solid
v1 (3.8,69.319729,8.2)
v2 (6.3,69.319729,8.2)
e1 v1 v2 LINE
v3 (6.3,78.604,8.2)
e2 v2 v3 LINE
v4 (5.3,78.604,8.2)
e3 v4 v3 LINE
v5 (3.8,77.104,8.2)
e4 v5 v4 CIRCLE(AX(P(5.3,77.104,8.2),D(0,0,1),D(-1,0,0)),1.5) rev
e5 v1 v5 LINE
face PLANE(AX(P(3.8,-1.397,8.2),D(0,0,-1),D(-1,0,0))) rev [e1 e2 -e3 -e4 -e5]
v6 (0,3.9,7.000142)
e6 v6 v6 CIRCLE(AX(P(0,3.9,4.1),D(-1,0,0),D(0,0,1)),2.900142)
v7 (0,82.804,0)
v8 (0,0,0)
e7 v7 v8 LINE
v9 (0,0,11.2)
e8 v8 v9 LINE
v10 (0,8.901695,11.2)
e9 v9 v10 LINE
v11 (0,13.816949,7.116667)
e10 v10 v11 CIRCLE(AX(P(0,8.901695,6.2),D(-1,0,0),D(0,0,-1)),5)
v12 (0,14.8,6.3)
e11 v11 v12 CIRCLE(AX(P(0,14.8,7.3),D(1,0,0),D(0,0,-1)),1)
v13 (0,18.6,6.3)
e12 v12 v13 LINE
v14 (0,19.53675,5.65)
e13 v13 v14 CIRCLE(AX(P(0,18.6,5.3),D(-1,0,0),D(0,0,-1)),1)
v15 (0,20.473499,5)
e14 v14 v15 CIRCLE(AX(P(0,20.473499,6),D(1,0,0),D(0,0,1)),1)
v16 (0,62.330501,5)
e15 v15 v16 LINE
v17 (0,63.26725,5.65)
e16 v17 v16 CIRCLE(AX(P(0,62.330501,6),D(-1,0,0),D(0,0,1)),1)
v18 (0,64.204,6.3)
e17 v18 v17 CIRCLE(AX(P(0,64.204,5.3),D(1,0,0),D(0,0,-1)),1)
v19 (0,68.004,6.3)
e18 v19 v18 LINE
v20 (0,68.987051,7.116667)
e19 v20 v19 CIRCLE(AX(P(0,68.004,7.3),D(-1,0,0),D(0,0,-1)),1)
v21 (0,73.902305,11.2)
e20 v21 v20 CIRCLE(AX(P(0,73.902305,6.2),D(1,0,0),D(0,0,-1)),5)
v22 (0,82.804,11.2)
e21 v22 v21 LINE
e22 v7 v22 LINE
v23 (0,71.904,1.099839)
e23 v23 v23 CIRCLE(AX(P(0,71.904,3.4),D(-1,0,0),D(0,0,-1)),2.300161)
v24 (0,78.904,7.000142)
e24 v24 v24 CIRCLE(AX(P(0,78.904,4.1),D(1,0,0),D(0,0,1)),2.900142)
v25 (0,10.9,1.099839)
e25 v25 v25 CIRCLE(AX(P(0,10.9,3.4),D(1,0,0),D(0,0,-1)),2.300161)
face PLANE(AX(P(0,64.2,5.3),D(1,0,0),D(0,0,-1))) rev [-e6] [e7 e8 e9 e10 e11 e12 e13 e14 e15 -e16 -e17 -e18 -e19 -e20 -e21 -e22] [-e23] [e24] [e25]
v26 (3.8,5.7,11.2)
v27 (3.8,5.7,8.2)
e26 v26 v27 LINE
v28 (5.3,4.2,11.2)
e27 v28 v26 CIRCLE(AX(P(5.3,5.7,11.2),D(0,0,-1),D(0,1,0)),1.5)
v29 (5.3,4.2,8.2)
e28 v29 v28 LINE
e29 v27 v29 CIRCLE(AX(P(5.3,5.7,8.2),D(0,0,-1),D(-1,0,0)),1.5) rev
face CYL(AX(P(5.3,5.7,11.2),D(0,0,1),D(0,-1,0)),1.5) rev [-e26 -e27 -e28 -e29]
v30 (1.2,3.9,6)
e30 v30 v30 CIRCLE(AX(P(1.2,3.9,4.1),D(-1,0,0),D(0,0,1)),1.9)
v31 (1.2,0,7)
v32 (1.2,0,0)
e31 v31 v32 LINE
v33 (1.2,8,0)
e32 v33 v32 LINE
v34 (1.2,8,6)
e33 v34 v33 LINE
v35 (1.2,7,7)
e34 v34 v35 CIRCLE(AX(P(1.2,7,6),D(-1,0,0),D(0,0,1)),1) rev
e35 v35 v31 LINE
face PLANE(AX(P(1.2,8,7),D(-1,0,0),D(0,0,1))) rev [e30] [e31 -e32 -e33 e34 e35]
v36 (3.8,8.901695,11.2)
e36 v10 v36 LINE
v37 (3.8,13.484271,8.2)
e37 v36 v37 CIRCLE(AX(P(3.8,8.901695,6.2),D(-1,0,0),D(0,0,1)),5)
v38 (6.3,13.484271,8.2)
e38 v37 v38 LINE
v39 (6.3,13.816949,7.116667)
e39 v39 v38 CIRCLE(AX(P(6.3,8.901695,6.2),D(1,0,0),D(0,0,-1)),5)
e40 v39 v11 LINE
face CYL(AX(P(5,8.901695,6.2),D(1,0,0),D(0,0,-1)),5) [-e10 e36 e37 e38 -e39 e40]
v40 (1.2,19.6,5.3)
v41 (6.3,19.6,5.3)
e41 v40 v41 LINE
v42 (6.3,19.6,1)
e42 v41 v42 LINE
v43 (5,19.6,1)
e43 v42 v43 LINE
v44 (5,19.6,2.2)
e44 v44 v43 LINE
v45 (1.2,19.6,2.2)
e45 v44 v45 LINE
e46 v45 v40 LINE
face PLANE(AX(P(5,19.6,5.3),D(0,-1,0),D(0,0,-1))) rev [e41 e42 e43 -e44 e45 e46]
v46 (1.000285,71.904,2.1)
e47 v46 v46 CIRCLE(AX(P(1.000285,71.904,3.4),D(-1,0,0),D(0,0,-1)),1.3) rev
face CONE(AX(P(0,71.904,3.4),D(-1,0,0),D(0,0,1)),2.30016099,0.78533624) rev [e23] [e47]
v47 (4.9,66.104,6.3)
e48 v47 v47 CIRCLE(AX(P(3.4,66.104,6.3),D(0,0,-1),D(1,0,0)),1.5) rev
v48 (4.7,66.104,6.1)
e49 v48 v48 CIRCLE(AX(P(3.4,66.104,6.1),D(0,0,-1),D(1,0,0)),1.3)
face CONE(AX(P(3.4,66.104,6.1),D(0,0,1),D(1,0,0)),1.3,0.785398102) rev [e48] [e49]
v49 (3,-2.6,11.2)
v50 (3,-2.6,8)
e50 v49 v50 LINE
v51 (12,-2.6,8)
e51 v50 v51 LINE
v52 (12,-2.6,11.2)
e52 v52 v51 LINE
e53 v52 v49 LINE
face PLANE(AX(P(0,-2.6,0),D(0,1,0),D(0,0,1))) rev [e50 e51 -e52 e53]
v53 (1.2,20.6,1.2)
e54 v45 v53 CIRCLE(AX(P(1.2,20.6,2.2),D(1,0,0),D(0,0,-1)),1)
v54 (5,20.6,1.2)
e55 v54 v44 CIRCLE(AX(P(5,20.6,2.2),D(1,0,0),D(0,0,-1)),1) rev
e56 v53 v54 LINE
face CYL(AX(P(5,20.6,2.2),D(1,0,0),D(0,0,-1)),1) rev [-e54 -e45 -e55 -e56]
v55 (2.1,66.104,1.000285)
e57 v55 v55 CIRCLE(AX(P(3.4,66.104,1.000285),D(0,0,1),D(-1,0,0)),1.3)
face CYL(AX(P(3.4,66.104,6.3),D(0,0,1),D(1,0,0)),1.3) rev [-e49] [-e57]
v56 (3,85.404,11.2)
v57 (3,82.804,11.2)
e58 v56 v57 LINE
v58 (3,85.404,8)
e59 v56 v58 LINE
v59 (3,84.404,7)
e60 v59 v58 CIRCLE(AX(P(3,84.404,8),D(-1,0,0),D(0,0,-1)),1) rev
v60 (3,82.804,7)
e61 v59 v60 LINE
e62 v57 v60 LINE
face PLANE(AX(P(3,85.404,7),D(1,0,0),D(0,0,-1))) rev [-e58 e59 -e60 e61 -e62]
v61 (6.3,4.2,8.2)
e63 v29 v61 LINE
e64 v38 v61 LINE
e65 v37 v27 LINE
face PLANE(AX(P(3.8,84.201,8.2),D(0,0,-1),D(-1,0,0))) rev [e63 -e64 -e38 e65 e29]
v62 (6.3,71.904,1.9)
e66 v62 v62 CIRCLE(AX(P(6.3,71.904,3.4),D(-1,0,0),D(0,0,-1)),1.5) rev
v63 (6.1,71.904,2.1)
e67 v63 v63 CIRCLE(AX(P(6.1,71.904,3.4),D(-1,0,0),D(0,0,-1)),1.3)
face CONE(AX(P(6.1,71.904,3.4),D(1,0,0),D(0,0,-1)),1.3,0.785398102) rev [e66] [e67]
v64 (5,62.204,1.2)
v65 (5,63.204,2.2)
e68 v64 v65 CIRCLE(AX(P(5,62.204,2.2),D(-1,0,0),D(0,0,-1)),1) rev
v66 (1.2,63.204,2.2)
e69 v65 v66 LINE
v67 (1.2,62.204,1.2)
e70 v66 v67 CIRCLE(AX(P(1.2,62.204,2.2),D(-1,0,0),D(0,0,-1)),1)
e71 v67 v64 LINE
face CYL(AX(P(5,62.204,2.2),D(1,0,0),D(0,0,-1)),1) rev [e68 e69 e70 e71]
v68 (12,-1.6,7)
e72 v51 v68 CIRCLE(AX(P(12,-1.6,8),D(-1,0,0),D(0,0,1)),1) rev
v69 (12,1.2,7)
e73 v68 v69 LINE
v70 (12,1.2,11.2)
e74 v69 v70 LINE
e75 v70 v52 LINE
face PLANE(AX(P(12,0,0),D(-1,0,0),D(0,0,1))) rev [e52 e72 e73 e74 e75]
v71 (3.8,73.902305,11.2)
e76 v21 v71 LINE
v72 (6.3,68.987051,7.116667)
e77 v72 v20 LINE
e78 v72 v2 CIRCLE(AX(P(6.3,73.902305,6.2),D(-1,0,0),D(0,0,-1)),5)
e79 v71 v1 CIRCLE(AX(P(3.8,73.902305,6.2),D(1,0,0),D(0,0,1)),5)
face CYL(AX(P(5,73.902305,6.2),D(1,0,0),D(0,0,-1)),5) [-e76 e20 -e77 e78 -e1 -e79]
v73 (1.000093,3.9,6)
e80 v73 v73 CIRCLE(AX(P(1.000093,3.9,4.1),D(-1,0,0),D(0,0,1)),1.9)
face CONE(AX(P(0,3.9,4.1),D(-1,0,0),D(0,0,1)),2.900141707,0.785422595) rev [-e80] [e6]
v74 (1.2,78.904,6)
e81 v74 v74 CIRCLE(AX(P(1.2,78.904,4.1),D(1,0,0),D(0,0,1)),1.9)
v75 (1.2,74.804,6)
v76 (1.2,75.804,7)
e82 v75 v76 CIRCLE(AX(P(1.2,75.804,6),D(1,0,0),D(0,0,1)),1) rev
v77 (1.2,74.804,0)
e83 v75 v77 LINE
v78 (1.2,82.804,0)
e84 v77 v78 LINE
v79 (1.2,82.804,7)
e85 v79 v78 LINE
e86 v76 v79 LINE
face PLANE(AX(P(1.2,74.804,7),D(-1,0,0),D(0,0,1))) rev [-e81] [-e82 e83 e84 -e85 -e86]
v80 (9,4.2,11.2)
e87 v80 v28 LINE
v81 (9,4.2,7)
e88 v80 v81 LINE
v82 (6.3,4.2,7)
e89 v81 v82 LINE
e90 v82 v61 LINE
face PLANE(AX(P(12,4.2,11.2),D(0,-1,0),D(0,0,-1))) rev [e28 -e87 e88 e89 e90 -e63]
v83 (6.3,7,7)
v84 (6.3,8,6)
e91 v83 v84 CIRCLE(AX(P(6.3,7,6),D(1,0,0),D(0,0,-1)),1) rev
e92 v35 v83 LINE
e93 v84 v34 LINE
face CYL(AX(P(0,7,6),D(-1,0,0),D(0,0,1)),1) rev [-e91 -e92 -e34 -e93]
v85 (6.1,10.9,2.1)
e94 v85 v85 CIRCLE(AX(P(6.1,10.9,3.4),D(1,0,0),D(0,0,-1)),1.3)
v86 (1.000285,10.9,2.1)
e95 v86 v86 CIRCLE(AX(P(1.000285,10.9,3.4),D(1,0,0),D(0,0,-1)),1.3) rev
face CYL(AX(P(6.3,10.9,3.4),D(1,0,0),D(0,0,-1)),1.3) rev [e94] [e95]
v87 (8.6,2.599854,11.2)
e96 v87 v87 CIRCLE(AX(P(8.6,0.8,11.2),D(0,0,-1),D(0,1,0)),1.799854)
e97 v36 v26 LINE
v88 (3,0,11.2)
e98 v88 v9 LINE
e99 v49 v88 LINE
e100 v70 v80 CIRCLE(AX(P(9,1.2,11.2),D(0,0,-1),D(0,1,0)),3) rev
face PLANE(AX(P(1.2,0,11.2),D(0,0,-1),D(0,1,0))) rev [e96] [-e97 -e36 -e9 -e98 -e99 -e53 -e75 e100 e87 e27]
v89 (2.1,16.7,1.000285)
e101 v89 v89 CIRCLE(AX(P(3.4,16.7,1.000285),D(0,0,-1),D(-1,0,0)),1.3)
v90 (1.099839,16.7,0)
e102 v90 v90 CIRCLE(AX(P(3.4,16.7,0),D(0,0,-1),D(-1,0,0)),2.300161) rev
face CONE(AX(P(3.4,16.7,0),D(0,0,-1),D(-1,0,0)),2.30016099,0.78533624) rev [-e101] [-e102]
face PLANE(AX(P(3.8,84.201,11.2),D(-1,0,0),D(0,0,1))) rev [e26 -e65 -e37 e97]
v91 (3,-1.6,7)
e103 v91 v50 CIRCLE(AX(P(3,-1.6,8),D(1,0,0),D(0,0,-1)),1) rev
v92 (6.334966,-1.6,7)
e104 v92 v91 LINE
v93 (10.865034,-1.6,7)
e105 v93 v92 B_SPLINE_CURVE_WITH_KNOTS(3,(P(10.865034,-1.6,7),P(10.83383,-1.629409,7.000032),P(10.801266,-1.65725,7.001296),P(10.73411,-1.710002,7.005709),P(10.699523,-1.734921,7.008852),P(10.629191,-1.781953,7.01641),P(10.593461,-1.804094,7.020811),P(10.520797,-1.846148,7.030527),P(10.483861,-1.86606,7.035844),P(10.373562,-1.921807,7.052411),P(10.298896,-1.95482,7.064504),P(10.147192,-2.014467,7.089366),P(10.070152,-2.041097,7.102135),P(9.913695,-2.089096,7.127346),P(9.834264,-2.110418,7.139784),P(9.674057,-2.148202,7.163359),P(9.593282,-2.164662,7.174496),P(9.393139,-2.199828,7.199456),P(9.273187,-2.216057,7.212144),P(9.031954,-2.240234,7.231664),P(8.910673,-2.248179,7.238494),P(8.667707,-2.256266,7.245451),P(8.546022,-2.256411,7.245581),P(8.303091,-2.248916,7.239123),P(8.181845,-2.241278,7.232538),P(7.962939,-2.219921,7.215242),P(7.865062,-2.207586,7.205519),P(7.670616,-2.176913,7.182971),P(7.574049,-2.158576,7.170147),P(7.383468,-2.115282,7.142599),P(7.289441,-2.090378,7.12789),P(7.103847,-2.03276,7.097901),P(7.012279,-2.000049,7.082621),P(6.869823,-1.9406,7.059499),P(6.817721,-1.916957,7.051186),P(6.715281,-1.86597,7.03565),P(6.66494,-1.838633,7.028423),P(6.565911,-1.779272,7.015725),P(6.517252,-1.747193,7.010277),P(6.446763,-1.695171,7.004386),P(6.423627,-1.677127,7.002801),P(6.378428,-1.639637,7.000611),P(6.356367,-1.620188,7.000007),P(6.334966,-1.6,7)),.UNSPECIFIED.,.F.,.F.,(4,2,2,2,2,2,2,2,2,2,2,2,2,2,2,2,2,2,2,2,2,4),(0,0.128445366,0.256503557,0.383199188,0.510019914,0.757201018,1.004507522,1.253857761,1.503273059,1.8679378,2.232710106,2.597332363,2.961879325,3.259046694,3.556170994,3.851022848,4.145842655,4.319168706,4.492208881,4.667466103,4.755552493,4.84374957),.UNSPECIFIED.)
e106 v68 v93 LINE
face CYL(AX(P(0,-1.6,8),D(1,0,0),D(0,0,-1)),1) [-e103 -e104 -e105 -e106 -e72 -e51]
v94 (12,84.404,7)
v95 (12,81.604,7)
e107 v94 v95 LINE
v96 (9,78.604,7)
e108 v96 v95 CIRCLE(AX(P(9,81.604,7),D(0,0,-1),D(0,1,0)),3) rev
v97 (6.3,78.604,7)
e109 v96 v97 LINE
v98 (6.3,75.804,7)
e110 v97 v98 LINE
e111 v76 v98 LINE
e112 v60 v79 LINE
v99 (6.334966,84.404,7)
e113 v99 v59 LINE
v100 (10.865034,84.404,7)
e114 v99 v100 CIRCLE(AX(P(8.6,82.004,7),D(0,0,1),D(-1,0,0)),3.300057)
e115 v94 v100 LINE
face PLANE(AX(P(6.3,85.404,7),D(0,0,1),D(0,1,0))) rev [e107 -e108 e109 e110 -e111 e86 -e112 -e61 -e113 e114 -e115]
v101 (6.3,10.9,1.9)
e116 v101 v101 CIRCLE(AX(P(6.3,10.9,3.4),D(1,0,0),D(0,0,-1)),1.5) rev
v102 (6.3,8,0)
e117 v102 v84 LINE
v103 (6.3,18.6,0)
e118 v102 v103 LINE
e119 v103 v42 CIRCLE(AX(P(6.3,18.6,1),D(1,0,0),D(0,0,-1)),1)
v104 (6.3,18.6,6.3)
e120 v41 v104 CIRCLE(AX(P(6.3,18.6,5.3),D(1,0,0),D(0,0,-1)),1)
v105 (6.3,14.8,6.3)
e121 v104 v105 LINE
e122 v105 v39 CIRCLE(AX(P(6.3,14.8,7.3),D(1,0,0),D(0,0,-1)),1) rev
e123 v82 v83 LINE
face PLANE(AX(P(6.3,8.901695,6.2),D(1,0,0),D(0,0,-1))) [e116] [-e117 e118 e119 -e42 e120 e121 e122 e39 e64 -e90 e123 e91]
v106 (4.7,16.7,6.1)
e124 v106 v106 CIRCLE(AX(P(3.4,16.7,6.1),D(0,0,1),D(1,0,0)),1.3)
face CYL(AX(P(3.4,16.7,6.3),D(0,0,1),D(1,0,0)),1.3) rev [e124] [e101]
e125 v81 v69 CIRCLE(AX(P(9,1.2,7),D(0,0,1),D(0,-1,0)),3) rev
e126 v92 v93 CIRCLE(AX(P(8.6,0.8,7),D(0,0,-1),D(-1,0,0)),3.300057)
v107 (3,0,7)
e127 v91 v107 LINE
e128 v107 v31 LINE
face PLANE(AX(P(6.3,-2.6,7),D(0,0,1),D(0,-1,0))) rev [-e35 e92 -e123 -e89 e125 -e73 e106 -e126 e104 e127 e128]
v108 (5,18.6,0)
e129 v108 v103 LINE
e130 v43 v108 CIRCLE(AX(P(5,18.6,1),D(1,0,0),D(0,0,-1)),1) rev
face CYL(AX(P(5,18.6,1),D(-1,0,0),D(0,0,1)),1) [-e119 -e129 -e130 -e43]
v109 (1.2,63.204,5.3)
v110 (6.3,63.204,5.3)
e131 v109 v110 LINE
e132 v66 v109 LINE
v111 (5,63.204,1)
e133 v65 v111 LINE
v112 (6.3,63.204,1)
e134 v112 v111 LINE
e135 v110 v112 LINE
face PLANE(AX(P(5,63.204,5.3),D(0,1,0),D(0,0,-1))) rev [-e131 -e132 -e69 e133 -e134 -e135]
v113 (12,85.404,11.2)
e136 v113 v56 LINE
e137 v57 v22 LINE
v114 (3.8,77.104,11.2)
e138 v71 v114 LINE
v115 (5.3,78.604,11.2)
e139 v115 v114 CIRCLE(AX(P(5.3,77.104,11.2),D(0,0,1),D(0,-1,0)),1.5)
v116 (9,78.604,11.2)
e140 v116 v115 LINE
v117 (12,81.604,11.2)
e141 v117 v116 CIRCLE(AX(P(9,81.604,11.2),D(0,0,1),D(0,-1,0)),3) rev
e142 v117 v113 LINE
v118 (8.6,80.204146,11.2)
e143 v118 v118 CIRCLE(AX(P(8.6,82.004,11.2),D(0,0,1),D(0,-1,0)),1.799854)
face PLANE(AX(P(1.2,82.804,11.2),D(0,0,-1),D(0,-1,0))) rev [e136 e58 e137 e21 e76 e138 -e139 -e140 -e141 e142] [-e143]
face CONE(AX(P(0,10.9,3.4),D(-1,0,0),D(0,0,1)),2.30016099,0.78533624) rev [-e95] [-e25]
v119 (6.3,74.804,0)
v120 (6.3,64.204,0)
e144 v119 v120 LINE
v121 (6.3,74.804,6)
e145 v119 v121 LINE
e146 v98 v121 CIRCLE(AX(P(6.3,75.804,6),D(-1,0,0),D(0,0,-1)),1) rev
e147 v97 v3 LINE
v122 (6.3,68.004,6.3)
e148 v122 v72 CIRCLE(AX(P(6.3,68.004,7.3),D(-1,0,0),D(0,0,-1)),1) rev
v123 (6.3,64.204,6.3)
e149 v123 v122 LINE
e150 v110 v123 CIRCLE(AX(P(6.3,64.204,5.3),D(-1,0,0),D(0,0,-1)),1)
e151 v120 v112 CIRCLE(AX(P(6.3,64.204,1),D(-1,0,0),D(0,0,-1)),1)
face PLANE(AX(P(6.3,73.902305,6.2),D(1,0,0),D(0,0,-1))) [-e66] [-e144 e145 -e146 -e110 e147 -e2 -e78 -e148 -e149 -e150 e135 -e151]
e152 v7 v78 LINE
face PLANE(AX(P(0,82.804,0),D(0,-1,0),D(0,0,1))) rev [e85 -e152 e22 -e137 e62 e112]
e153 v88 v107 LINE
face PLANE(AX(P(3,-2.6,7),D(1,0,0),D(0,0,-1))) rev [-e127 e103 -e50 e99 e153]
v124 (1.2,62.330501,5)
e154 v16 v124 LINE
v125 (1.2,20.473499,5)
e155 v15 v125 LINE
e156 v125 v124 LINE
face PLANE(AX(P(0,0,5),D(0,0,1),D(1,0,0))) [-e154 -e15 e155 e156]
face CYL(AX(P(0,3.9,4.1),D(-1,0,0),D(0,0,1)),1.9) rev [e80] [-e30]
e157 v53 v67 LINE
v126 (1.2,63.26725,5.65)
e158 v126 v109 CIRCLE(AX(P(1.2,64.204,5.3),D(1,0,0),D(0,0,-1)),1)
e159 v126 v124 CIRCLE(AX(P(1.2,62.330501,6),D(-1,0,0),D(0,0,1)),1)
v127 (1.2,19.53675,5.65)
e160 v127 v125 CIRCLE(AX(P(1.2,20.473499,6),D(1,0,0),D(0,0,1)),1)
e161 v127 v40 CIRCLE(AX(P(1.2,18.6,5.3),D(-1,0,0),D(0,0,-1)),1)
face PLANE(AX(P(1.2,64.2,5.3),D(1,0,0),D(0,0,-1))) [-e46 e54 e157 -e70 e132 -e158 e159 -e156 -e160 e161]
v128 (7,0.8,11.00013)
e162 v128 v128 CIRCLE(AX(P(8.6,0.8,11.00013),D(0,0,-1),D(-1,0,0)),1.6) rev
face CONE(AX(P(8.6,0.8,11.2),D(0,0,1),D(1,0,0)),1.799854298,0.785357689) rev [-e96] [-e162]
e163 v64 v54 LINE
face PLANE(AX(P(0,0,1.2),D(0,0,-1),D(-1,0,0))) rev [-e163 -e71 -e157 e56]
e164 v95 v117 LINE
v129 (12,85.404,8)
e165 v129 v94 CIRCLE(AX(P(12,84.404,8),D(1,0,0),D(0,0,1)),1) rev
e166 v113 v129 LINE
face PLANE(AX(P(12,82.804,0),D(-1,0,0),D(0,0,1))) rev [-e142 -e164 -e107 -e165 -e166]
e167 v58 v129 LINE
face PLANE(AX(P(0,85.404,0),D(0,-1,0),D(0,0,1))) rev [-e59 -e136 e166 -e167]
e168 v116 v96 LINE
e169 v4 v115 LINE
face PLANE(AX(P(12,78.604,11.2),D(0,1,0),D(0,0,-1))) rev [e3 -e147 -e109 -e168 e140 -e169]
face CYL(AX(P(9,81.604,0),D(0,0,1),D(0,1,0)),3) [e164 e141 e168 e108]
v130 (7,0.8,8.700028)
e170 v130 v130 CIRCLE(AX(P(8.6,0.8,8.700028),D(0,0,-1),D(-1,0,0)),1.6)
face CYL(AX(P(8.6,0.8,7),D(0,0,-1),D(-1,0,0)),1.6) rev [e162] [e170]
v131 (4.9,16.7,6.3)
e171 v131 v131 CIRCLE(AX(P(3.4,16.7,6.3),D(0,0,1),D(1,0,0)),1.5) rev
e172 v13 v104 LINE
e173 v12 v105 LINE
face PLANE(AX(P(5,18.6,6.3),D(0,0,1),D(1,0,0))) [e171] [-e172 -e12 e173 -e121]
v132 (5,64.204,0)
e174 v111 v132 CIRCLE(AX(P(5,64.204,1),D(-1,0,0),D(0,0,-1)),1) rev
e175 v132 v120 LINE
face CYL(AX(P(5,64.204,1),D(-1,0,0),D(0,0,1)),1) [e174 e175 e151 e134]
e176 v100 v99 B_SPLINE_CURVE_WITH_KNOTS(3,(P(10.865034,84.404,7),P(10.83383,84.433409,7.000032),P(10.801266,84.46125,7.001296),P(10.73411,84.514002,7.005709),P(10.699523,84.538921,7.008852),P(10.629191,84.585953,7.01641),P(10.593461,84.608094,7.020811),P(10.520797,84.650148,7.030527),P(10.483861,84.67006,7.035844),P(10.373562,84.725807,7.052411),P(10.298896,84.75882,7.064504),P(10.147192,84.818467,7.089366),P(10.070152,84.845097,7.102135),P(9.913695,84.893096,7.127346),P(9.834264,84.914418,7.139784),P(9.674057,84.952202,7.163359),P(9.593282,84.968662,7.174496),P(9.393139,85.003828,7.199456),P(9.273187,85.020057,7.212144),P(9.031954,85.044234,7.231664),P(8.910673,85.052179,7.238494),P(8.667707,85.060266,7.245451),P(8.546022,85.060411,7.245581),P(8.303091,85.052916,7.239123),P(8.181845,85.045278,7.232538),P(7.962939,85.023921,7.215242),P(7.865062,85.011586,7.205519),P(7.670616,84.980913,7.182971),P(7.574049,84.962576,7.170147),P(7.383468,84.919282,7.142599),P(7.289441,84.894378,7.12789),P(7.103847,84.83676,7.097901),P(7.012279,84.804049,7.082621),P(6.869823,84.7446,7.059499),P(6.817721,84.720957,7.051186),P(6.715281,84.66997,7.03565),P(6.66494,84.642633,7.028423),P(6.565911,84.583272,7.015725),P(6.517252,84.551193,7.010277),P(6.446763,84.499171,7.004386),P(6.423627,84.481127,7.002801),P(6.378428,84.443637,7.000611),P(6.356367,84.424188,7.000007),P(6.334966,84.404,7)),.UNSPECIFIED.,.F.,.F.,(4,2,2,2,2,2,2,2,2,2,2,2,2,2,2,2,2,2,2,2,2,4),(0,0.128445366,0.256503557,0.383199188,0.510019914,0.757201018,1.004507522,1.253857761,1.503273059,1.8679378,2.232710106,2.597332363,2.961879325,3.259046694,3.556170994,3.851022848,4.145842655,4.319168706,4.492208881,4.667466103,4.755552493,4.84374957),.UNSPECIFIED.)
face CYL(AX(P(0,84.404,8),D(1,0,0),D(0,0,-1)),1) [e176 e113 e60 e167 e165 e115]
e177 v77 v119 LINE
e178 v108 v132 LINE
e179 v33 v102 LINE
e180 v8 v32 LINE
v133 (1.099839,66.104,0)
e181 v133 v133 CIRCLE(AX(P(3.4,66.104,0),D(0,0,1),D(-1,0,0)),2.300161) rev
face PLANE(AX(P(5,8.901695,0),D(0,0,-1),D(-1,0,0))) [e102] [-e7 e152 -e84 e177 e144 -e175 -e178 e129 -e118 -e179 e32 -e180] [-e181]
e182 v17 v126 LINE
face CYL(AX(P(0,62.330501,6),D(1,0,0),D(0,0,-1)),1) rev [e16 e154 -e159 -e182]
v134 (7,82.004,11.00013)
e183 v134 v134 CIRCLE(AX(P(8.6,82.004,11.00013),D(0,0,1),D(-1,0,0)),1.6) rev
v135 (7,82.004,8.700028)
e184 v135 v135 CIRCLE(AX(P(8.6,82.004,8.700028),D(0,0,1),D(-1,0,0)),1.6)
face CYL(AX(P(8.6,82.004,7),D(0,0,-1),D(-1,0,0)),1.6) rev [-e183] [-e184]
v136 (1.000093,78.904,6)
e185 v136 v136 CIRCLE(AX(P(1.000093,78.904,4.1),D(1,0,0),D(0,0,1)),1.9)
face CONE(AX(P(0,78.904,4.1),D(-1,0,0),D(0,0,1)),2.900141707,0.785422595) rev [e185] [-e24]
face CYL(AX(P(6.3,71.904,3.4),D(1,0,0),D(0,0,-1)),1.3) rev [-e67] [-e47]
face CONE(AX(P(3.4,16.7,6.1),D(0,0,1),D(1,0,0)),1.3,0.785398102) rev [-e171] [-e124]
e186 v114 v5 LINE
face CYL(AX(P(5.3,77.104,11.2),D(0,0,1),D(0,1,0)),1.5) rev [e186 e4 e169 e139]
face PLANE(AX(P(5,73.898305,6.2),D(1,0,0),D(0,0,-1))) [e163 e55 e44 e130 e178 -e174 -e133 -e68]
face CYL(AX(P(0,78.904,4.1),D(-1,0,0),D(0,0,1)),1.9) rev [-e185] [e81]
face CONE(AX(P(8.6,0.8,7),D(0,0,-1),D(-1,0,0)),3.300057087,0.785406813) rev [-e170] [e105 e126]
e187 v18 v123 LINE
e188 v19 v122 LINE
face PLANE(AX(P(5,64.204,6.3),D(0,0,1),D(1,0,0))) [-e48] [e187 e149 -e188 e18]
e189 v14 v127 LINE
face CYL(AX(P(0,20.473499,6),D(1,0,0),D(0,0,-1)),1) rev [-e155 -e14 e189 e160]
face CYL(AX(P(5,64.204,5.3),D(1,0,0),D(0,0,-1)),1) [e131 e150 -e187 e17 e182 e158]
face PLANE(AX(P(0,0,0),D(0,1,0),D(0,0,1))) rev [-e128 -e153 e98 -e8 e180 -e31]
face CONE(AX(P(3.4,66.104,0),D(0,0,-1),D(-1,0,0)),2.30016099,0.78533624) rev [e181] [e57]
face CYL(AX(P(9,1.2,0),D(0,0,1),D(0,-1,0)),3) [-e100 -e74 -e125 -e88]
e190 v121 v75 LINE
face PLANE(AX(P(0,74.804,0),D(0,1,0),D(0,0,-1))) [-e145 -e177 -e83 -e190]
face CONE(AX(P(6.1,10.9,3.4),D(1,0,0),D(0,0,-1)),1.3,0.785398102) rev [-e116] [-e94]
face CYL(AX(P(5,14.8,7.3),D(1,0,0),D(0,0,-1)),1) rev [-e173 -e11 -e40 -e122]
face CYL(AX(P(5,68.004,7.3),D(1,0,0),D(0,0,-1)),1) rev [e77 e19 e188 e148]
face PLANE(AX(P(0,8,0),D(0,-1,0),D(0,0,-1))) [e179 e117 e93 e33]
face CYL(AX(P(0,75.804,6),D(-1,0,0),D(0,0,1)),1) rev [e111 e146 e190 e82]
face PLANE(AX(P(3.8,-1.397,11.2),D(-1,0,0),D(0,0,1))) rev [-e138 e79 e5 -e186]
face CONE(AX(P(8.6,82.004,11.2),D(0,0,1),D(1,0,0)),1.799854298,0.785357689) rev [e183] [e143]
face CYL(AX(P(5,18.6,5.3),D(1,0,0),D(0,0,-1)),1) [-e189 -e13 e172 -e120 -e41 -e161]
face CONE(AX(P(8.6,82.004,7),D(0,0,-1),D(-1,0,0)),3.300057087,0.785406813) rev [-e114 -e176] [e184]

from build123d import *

# Parameters (mm, degrees)
SALIENTE_EXTRUIR1_DEPTH                              = 1.3
SALIENTE_EXTRUIR2_DEPTH                              = 3.8
CORTAR_EXTRUIR1_DEPTH                                = 1.3
SALIENTE_EXTRUIR3_START                              = 1.3
SALIENTE_EXTRUIR3_DEPTH                              = 1.3
CROQUIS14_W                                          = 5.1
CROQUIS14_H                                          = 11.2
SALIENTE_EXTRUIR4_DEPTH                              = 8.901695159
CROQUIS15_W                                          = 5.1
CROQUIS15_H                                          = 11.2
SALIENTE_EXTRUIR5_DEPTH                              = 8.901695176
CROQUIS22_W                                          = 3.8
CROQUIS22_H                                          = 43.6
CORTAR_EXTRUIR2_DEPTH                                = 0.3
SALIENTE_EXTRUIR6_DEPTH                              = 1.2
CROQUIS31_W                                          = 4.2
CROQUIS31_H                                          = 5.4
SALIENTE_EXTRUIR7_DEPTH                              = 3.5
CROQUIS32_W                                          = 7
CROQUIS32_H                                          = 8
CORTAR_EXTRUIR3_DEPTH                                = 5.1
CROQUIS41_W                                          = 6.8
CROQUIS41_H                                          = 4.2
SALIENTE_EXTRUIR8_DEPTH                              = 1.4
CROQUIS42_W                                          = 3.3
CROQUIS42_H                                          = 4.2
SALIENTE_EXTRUIR9_DEPTH                              = 2.6
CROQUIS43_W                                          = 5.1
CROQUIS43_H                                          = 7
CORTAR_EXTRUIR4_DEPTH                                = 8
CROQUIS48_W                                          = 4.2
CROQUIS48_H                                          = 6.8
SALIENTE_EXTRUIR10_DEPTH                             = 5.7
CORTAR_EXTRUIR5_REACH                                = 87.637
CROQUIS58_W                                          = 3.8
CROQUIS58_H                                          = 43.6
CORTAR_EXTRUIR6_REACH                                = 83.667
CROQUIS80_W                                          = 2.5
CROQUIS80_H                                          = 3
CORTAR_EXTRUIR7_REACH                                = 83.667
CROQUIS93_W                                          = 2.5
CROQUIS93_H                                          = 3
AVELLANADO_PARA_TORNILLO_CON_CABEZA_PLAN_D           = 3.8
AVELLANADO_PARA_TORNILLO_CON_CABEZA_PLAN_DEPTH       = 12
AVELLANADO_PARA_TORNILLO_CON_CABEZA_PLAN_CSINK_D     = 5.800283413
AVELLANADO_PARA_TORNILLO_CON_CABEZA_PLAN_CSINK_ANGLE = 90.0028
TALADRO_DE_MARGEN_PARA_21_D                          = 2.6
TALADRO_DE_MARGEN_PARA_22_D                          = 2.6
TALADRO_DE_MARGEN_PARA_22_DEPTH                      = 11.2
TALADRO_DE_MARGEN_PARA_23_D                          = 2.6
AVELLANADO_PARA_TORNILLO_CON_CABEZA_2_D              = 3.2
AVELLANADO_PARA_TORNILLO_CON_CABEZA_2_CSINK_D        = 6.600114174
AVELLANADO_PARA_TORNILLO_CON_CABEZA_2_CSINK_ANGLE    = 90.000991
REDONDEO1_R                                          = 3
CHAFL_N1_SIZE2                                       = 0.19999984
CHAFL_N1_SIZE                                        = 0.199999815
CORTAR_EXTRUIR8_OUTLINE_R                            = 1.3
CORTAR_EXTRUIR8_OUTLINE_R_2                          = 1.9
CORTAR_EXTRUIR8_DEPTH                                = 13
CORTAR_EXTRUIR8_START                                = 5
CORTAR_EXTRUIR8_2_DEPTH                              = 1.3
CORTAR_EXTRUIR8_3_DEPTH                              = 5
CORTAR_EXTRUIR8_4_DEPTH                              = 1.3
CORTAR_EXTRUIR8_START_2                              = 7
CORTAR_EXTRUIR8_5_DEPTH                              = 4.2


with BuildPart() as part:
    # Croquis1 → Saliente-Extruir1 (new body)
    with BuildSketch(Plane(origin=(6.3, 0, 0), x_dir=(0, 0, -1), z_dir=(1, 0, 0))):
        with BuildLine():
            Line((-11.2, 8.901695159), (0, 8.901695159))
            Line((0, 8.901695159), (0, 73.898304841))
            Line((0, 73.898304841), (-11.2, 73.898304841))
            ThreePointArc((-11.2, 73.898304841), (-9.770714214, 70.398304841), (-6.3, 68.899304941))
            Line((-6.3, 68.899304941), (-6.3, 64.2))
            ThreePointArc((-6.3, 64.2), (-6.007106781, 63.492893219), (-5.3, 63.2))
            Line((-5.3, 63.2), (-5.3, 19.6))
            ThreePointArc((-5.3, 19.6), (-6.007106781, 19.307106781), (-6.3, 18.6))
            Line((-6.3, 18.6), (-6.3, 13.900695059))
            ThreePointArc((-6.3, 13.900695059), (-9.770714214, 12.401695159), (-11.2, 8.901695159))
        make_face()
    extrude(amount=-SALIENTE_EXTRUIR1_DEPTH)

    # Croquis6 → Saliente-Extruir2 (add)
    with BuildSketch(Plane.ZY.offset(-5)):
        with BuildLine():
            Line((0, 73.898304841), (11.2, 73.898304841))
            ThreePointArc((11.2, 73.898304841), (9.770714214, 70.398304841), (6.3, 68.899304941))
            Line((6.3, 68.899304941), (6.3, 64.2))
            ThreePointArc((6.3, 64.2), (6.007106781, 63.492893219), (5.3, 63.2))
            Line((5.3, 63.2), (5.3, 19.6))
            ThreePointArc((5.3, 19.6), (6.007106781, 19.307106781), (6.3, 18.6))
            Line((6.3, 18.6), (6.3, 13.900695059))
            ThreePointArc((6.3, 13.900695059), (9.770714214, 12.401695159), (11.2, 8.901695159))
            Line((11.2, 8.901695159), (0, 8.901695159))
            Line((0, 8.901695159), (0, 73.898304841))
        make_face()
    extrude(amount=SALIENTE_EXTRUIR2_DEPTH)

    # Croquis7 → Cortar-Extruir1 (cut)
    with BuildSketch(Plane(origin=(6.3, 0, 0), x_dir=(0, 0, -1), z_dir=(1, 0, 0))):
        with BuildLine():
            Line((-5.3, 19.6), (0, 19.6))
            Line((0, 19.6), (0, 73.898304841))
            Line((0, 73.898304841), (-11.2, 73.898304841))
            ThreePointArc((-11.2, 73.898304841), (-9.770714214, 70.398304841), (-6.3, 68.899304941))
            Line((-6.3, 68.899304941), (-6.3, 64.2))
            ThreePointArc((-6.3, 64.2), (-6.007106781, 63.492893219), (-5.3, 63.2))
            Line((-5.3, 63.2), (-5.3, 19.6))
        make_face()
    extrude(amount=-CORTAR_EXTRUIR1_DEPTH, mode=Mode.SUBTRACT)

    # Croquis8 → Saliente-Extruir3 (add)
    with BuildSketch(Plane(origin=(5, 0, 0), x_dir=(0, 0, -1), z_dir=(1, 0, 0)).offset(SALIENTE_EXTRUIR3_START)):
        with BuildLine():
            Line((0, 73.898304841), (0, 63.2))
            Line((0, 63.2), (-5.3, 63.2))
            ThreePointArc((-5.3, 63.2), (-6.007106781, 63.492893219), (-6.3, 64.2))
            Line((-6.3, 64.2), (-6.3, 68.899304941))
            ThreePointArc((-6.3, 68.899304941), (-9.770714214, 70.398304841), (-11.2, 73.898304841))
            Line((-11.2, 73.898304841), (0, 73.898304841))
        make_face()
    extrude(amount=-SALIENTE_EXTRUIR3_DEPTH)

    # Croquis14 → Saliente-Extruir4 (add)
    with BuildSketch(Plane(origin=(0, 73.898304841, 0), x_dir=(1, 0, 0), z_dir=(0, 1, 0))):
        with Locations((3.75, -5.6)):
            Rectangle(CROQUIS14_W, CROQUIS14_H)
    extrude(amount=SALIENTE_EXTRUIR4_DEPTH)

    # Croquis15 → Saliente-Extruir5 (add)
    with BuildSketch(Plane.XZ.offset(-8.901695159)):
        with Locations((3.75, 5.6)):
            Rectangle(CROQUIS15_W, CROQUIS15_H)
    extrude(amount=SALIENTE_EXTRUIR5_DEPTH)

    # Croquis22 → Cortar-Extruir2 (cut)
    with BuildSketch(Plane.XY.offset(5.3)):
        with Locations((3.1, 41.4)):
            Rectangle(CROQUIS22_W, CROQUIS22_H)
    extrude(amount=-CORTAR_EXTRUIR2_DEPTH, mode=Mode.SUBTRACT)

    # Croquis30 → Saliente-Extruir6 (add)
    with BuildSketch(Plane.ZY.offset(-1.2)):
        with BuildLine():
            Line((6.3, 68.899304941), (6.3, 64.2))
            ThreePointArc((6.3, 64.2), (6.121583836, 63.629912287), (5.65, 63.2632503))
            ThreePointArc((5.65, 63.2632503), (5.178416164, 62.896588313), (5, 62.3265006))
            Line((5, 62.3265006), (5, 20.4734994))
            ThreePointArc((5, 20.4734994), (5.178416164, 19.903411687), (5.65, 19.5367497))
            ThreePointArc((5.65, 19.5367497), (6.121583836, 19.170087713), (6.3, 18.6))
            Line((6.3, 18.6), (6.3, 13.900695059))
            ThreePointArc((6.3, 13.900695059), (9.770714214, 12.401695159), (11.2, 8.901695159))
            Line((11.2, 8.901695159), (11.2, 0))
            Line((11.2, 0), (0, 0))
            Line((0, 0), (0, 82.8))
            Line((0, 82.8), (11.2, 82.8))
            Line((11.2, 82.8), (11.2, 73.898304841))
            ThreePointArc((11.2, 73.898304841), (9.770714214, 70.398304841), (6.3, 68.899304941))
        make_face()
    extrude(amount=SALIENTE_EXTRUIR6_DEPTH)

    # Croquis31 → Saliente-Extruir7 (add)
    with BuildSketch(Plane(origin=(6.3, 0, 0), x_dir=(0, 0, -1), z_dir=(1, 0, 0))):
        with Locations((-9.1, 80.1)):
            Rectangle(CROQUIS31_W, CROQUIS31_H)
    extrude(amount=SALIENTE_EXTRUIR7_DEPTH)

    # Croquis32 → Cortar-Extruir3 (cut)
    with BuildSketch(Plane(origin=(6.3, 0, 0), x_dir=(0, 0, -1), z_dir=(1, 0, 0))):
        with Locations((-3.5, 78.8)):
            Rectangle(CROQUIS32_W, CROQUIS32_H)
    extrude(amount=-CORTAR_EXTRUIR3_DEPTH, mode=Mode.SUBTRACT)

    # Croquis41 → Saliente-Extruir8 (add)
    with BuildSketch(Plane(origin=(0, 82.8, 0), x_dir=(1, 0, 0), z_dir=(0, 1, 0))):
        with Locations((6.4, -9.1)):
            Rectangle(CROQUIS41_W, CROQUIS41_H)
    extrude(amount=SALIENTE_EXTRUIR8_DEPTH)

    # Croquis42 → Saliente-Extruir9 (add)
    with BuildSketch(Plane.XZ):
        with Locations((4.65, 9.1)):
            Rectangle(CROQUIS42_W, CROQUIS42_H)
    extrude(amount=SALIENTE_EXTRUIR9_DEPTH)

    # Croquis43 → Cortar-Extruir4 (cut)
    with BuildSketch(Plane.XZ):
        with Locations((3.75, 3.5)):
            Rectangle(CROQUIS43_W, CROQUIS43_H)
    extrude(amount=-CORTAR_EXTRUIR4_DEPTH, mode=Mode.SUBTRACT)

    # Croquis48 → Saliente-Extruir10 (add)
    with BuildSketch(Plane(origin=(6.3, 0, 0), x_dir=(0, 0, -1), z_dir=(1, 0, 0))):
        with Locations((-9.1, 0.8)):
            Rectangle(CROQUIS48_W, CROQUIS48_H)
    extrude(amount=SALIENTE_EXTRUIR10_DEPTH)

    # Croquis58 → Cortar-Extruir5 (cut, up to next)
    with BuildSketch(Plane(origin=(0, 0, 1.2), x_dir=(-1, 0, 0), z_dir=(0, 0, -1)), mode=Mode.PRIVATE) as cortar_extruir5_sk1:
        with Locations((-3.1, 41.4)):
            Rectangle(CROQUIS58_W, CROQUIS58_H)
    cortar_extruir5_tool1 = extrude(cortar_extruir5_sk1.sketch, amount=-CORTAR_EXTRUIR5_REACH, mode=Mode.PRIVATE) & part.part
    add(cortar_extruir5_tool1.solids().sort_by_distance((3.1, 41.4, 1.2))[0], mode=Mode.SUBTRACT)

    # Croquis80 → Cortar-Extruir6 (cut, up to next)
    with BuildSketch(Plane(origin=(0, 77.4, 0), x_dir=(1, 0, 0), z_dir=(0, 1, 0)), mode=Mode.PRIVATE) as cortar_extruir6_sk1:
        with Locations((5.05, -9.7)):
            Rectangle(CROQUIS80_W, CROQUIS80_H)
    cortar_extruir6_tool1 = extrude(cortar_extruir6_sk1.sketch, amount=-CORTAR_EXTRUIR6_REACH, mode=Mode.PRIVATE) & part.part
    add(cortar_extruir6_tool1.solids().sort_by_distance((5.05, 77.4, 9.7))[0], mode=Mode.SUBTRACT)

    # Croquis93 → Cortar-Extruir7 (cut, up to next)
    with BuildSketch(Plane(origin=(0, 4.2, 0), x_dir=(-1, 0, 0), z_dir=(0, -1, 0)), mode=Mode.PRIVATE) as cortar_extruir7_sk1:
        with Locations((-5.05, -9.7)):
            Rectangle(CROQUIS93_W, CROQUIS93_H)
    cortar_extruir7_tool1 = extrude(cortar_extruir7_sk1.sketch, amount=-CORTAR_EXTRUIR7_REACH, mode=Mode.PRIVATE) & part.part
    add(cortar_extruir7_tool1.solids().sort_by_distance((5.05, 4.2, 9.7))[0], mode=Mode.SUBTRACT)

    # Avellanado para tornillo con cabeza plan
    with Locations(Plane.ZY):
        with Locations((4.1, 3.9), (4.1, 78.9)):
            CounterSinkHole(AVELLANADO_PARA_TORNILLO_CON_CABEZA_PLAN_D / 2, AVELLANADO_PARA_TORNILLO_CON_CABEZA_PLAN_CSINK_D / 2, depth=AVELLANADO_PARA_TORNILLO_CON_CABEZA_PLAN_DEPTH, counter_sink_angle=AVELLANADO_PARA_TORNILLO_CON_CABEZA_PLAN_CSINK_ANGLE)

    # Taladro de margen para #21 (through all)
    with Locations(Plane(origin=(6.3, 0, 0), x_dir=(0, 0, -1), z_dir=(1, 0, 0))):
        with Locations((-3.4, 10.9), (-3.4, 71.9)):
            Hole(TALADRO_DE_MARGEN_PARA_21_D / 2)

    # Taladro de margen para #22
    with Locations(Plane(origin=(0, 0, 0), x_dir=(-1, 0, 0), z_dir=(0, 0, -1))):
        with Locations((-3.4, 66.1)):
            Hole(TALADRO_DE_MARGEN_PARA_22_D / 2, depth=TALADRO_DE_MARGEN_PARA_22_DEPTH)

    # Taladro de margen para #23 (through all)
    with Locations(Plane.XY.offset(6.3)):
        with Locations((3.4, 16.7)):
            Hole(TALADRO_DE_MARGEN_PARA_23_D / 2)

    # Avellanado para tornillo con cabeza  2 (through all)
    with Locations(Plane(origin=(0, 0, 7), x_dir=(-1, 0, 0), z_dir=(0, 0, -1))):
        with Locations((-6.4, 80.8), (-8.6, 0.8)):
            CounterSinkHole(AVELLANADO_PARA_TORNILLO_CON_CABEZA_2_D / 2, AVELLANADO_PARA_TORNILLO_CON_CABEZA_2_CSINK_D / 2, counter_sink_angle=AVELLANADO_PARA_TORNILLO_CON_CABEZA_2_CSINK_ANGLE)

    # Redondeo1
    redondeo1_edges = [part.edges().sort_by_distance(p)[0] for p in [
        (9.8, 77.4, 9.1),
        (12, 4.2, 9.1),
    ]]
    fillet(redondeo1_edges, radius=REDONDEO1_R)

    # Chaflán1
    chafl_n1_edges = [part.edges().sort_by_distance(p)[0] for p in [
        (6.3, 71.9, 2.1),
        (6.3, 10.9, 2.1),
        (2.1, 66.1, 6.3),
        (4.7, 16.7, 6.3),
    ]]
    chamfer(chafl_n1_edges, length=CHAFL_N1_SIZE, length2=CHAFL_N1_SIZE2)

    # Cortar-Extruir8: read off the stored shape, not the designer's step
    # Cortar-Extruir8 outline → Cortar-Extruir8 (cut)
    # profile 1 of 2: a face of its own
    with BuildSketch(Plane.YZ):
        with BuildLine():
            Line((-2.6, 7), (-1.6, 7))
            ThreePointArc((-1.6, 7), (-2.307106781, 7.292893219), (-2.6, 8))
            Line((-2.6, 8), (-2.6, 7))
        make_face()
    # profile 2 of 2: a face of its own
    with BuildSketch(Plane.YZ):
        with BuildLine():
            Line((41.402, 0), (82.8, 0))
            Line((82.8, 0), (82.8, 7))
            Line((82.8, 7), (84.2, 7))
            Line((84.2, 7), (84.2, 11.2))
            Line((84.2, 11.2), (73.898304841, 11.2))
            ThreePointArc((73.898304841, 11.2), (70.398304841, 9.770714214), (68.899304941, 6.3))
            Line((68.899304941, 6.3), (64.2, 6.3))
            ThreePointArc((64.2, 6.3), (63.629912288, 6.121583836), (63.2632503, 5.65))
            ThreePointArc((63.2632503, 5.65), (62.896588313, 5.178416164), (62.3265006, 5))
            Line((62.3265006, 5), (41.402, 5))
            Line((41.402, 5), (41.402, 0))
        make_face()
        with Locations((71.9, 3.4)):
            Circle(CORTAR_EXTRUIR8_OUTLINE_R, mode=Mode.SUBTRACT)
        with Locations((78.9, 4.1)):
            Circle(CORTAR_EXTRUIR8_OUTLINE_R_2, mode=Mode.SUBTRACT)
    extrude(amount=CORTAR_EXTRUIR8_DEPTH, mode=Mode.SUBTRACT)

    # Cortar-Extruir8 2 outline → Cortar-Extruir8 2 (cut)
    with BuildSketch(Plane.YZ.offset(CORTAR_EXTRUIR8_START)):
        with BuildLine():
            Line((19.6, 0), (19.6, 1))
            ThreePointArc((19.6, 1), (19.307106781, 0.292893219), (18.6, 0))
            Line((18.6, 0), (19.6, 0))
        make_face()
    extrude(amount=CORTAR_EXTRUIR8_2_DEPTH, mode=Mode.SUBTRACT)

    # Cortar-Extruir8 3 outline → Cortar-Extruir8 3 (add)
    with BuildSketch(Plane.YZ):
        with BuildLine():
            ThreePointArc((14.8, 6.3), (14.16099035, 6.530801283), (13.816949193, 7.116666667))
            ThreePointArc((13.816949193, 7.116666667), (13.875611511, 6.710055017), (13.900695059, 6.3))
            Line((13.900695059, 6.3), (14.8, 6.3))
        make_face()
        with BuildLine():
            ThreePointArc((7, 7), (7.707106781, 6.707106781), (8, 6))
            Line((8, 6), (8, 7))
            Line((8, 7), (7, 7))
        make_face()
        with BuildLine():
            Line((19.6, 2.2), (19.6, 1.2))
            Line((19.6, 1.2), (20.6, 1.2))
            ThreePointArc((20.6, 1.2), (19.892893219, 1.492893219), (19.6, 2.2))
        make_face()
    extrude(amount=CORTAR_EXTRUIR8_3_DEPTH)

    # Cortar-Extruir8 4 outline → Cortar-Extruir8 4 (add)
    with BuildSketch(Plane.YZ.offset(CORTAR_EXTRUIR8_START)):
        with BuildLine():
            ThreePointArc((14.8, 6.3), (14.16099035, 6.530801283), (13.816949193, 7.116666667))
            ThreePointArc((13.816949193, 7.116666667), (13.875611511, 6.710055017), (13.900695059, 6.3))
            Line((13.900695059, 6.3), (14.8, 6.3))
        make_face()
        with BuildLine():
            ThreePointArc((7, 7), (7.707106781, 6.707106781), (8, 6))
            Line((8, 6), (8, 7))
            Line((8, 7), (7, 7))
        make_face()
    extrude(amount=CORTAR_EXTRUIR8_4_DEPTH)

    # Cortar-Extruir8 5 outline → Cortar-Extruir8 5 (add)
    with BuildSketch(Plane.XY.offset(CORTAR_EXTRUIR8_START_2)):
        with BuildLine():
            ThreePointArc((5.3, 4.2), (4.239339828, 4.639339828), (3.8, 5.7))
            Line((3.8, 5.7), (3.8, 4.2))
            Line((3.8, 4.2), (5.3, 4.2))
        make_face()
    extrude(amount=CORTAR_EXTRUIR8_5_DEPTH)

    # Cortar-Extruir8 6 outline → Cortar-Extruir8 6 (revolve, cut)
    with BuildSketch(Plane(origin=(3.4, 16.7, 0), x_dir=(1, 0, 0), z_dir=(0, -1, 0))):
        Polygon((2.30016099, 0), (1.3, 1.000284865), (1.3, 0), align=None)
    revolve(axis=Axis((3.4, 16.7, 0), (0, 0, 1)), mode=Mode.SUBTRACT)

    # Cortar-Extruir8 7 outline → Cortar-Extruir8 7 (revolve, cut)
    with BuildSketch(Plane(origin=(0, 10.9, 3.4), x_dir=(0, 1, 0), z_dir=(0, 0, -1))):
        Polygon((2.30016099, 0), (1.3, 1.000284865), (1.3, 0), align=None)
    revolve(axis=Axis((0, 10.9, 3.4), (1, 0, 0)), mode=Mode.SUBTRACT)

    # Cortar-Extruir8 8 outline → Cortar-Extruir8 8 (revolve, cut)
    with BuildSketch(Plane(origin=(8.6, 0.8, 0), x_dir=(1, 0, 0), z_dir=(0, -1, 0))):
        Polygon((1.6, 11.2), (1.6, 11.000129523), (1.799854298, 11.2), align=None)
    revolve(axis=Axis((8.6, 0.8, 0), (0, 0, 1)), mode=Mode.SUBTRACT)

    # Simetría1: part across plane


with BuildPart() as part_1:
    add(part.part)
    add(part.part.mirror(Plane.ZX.offset(41.402)))


solid = part_1.part
